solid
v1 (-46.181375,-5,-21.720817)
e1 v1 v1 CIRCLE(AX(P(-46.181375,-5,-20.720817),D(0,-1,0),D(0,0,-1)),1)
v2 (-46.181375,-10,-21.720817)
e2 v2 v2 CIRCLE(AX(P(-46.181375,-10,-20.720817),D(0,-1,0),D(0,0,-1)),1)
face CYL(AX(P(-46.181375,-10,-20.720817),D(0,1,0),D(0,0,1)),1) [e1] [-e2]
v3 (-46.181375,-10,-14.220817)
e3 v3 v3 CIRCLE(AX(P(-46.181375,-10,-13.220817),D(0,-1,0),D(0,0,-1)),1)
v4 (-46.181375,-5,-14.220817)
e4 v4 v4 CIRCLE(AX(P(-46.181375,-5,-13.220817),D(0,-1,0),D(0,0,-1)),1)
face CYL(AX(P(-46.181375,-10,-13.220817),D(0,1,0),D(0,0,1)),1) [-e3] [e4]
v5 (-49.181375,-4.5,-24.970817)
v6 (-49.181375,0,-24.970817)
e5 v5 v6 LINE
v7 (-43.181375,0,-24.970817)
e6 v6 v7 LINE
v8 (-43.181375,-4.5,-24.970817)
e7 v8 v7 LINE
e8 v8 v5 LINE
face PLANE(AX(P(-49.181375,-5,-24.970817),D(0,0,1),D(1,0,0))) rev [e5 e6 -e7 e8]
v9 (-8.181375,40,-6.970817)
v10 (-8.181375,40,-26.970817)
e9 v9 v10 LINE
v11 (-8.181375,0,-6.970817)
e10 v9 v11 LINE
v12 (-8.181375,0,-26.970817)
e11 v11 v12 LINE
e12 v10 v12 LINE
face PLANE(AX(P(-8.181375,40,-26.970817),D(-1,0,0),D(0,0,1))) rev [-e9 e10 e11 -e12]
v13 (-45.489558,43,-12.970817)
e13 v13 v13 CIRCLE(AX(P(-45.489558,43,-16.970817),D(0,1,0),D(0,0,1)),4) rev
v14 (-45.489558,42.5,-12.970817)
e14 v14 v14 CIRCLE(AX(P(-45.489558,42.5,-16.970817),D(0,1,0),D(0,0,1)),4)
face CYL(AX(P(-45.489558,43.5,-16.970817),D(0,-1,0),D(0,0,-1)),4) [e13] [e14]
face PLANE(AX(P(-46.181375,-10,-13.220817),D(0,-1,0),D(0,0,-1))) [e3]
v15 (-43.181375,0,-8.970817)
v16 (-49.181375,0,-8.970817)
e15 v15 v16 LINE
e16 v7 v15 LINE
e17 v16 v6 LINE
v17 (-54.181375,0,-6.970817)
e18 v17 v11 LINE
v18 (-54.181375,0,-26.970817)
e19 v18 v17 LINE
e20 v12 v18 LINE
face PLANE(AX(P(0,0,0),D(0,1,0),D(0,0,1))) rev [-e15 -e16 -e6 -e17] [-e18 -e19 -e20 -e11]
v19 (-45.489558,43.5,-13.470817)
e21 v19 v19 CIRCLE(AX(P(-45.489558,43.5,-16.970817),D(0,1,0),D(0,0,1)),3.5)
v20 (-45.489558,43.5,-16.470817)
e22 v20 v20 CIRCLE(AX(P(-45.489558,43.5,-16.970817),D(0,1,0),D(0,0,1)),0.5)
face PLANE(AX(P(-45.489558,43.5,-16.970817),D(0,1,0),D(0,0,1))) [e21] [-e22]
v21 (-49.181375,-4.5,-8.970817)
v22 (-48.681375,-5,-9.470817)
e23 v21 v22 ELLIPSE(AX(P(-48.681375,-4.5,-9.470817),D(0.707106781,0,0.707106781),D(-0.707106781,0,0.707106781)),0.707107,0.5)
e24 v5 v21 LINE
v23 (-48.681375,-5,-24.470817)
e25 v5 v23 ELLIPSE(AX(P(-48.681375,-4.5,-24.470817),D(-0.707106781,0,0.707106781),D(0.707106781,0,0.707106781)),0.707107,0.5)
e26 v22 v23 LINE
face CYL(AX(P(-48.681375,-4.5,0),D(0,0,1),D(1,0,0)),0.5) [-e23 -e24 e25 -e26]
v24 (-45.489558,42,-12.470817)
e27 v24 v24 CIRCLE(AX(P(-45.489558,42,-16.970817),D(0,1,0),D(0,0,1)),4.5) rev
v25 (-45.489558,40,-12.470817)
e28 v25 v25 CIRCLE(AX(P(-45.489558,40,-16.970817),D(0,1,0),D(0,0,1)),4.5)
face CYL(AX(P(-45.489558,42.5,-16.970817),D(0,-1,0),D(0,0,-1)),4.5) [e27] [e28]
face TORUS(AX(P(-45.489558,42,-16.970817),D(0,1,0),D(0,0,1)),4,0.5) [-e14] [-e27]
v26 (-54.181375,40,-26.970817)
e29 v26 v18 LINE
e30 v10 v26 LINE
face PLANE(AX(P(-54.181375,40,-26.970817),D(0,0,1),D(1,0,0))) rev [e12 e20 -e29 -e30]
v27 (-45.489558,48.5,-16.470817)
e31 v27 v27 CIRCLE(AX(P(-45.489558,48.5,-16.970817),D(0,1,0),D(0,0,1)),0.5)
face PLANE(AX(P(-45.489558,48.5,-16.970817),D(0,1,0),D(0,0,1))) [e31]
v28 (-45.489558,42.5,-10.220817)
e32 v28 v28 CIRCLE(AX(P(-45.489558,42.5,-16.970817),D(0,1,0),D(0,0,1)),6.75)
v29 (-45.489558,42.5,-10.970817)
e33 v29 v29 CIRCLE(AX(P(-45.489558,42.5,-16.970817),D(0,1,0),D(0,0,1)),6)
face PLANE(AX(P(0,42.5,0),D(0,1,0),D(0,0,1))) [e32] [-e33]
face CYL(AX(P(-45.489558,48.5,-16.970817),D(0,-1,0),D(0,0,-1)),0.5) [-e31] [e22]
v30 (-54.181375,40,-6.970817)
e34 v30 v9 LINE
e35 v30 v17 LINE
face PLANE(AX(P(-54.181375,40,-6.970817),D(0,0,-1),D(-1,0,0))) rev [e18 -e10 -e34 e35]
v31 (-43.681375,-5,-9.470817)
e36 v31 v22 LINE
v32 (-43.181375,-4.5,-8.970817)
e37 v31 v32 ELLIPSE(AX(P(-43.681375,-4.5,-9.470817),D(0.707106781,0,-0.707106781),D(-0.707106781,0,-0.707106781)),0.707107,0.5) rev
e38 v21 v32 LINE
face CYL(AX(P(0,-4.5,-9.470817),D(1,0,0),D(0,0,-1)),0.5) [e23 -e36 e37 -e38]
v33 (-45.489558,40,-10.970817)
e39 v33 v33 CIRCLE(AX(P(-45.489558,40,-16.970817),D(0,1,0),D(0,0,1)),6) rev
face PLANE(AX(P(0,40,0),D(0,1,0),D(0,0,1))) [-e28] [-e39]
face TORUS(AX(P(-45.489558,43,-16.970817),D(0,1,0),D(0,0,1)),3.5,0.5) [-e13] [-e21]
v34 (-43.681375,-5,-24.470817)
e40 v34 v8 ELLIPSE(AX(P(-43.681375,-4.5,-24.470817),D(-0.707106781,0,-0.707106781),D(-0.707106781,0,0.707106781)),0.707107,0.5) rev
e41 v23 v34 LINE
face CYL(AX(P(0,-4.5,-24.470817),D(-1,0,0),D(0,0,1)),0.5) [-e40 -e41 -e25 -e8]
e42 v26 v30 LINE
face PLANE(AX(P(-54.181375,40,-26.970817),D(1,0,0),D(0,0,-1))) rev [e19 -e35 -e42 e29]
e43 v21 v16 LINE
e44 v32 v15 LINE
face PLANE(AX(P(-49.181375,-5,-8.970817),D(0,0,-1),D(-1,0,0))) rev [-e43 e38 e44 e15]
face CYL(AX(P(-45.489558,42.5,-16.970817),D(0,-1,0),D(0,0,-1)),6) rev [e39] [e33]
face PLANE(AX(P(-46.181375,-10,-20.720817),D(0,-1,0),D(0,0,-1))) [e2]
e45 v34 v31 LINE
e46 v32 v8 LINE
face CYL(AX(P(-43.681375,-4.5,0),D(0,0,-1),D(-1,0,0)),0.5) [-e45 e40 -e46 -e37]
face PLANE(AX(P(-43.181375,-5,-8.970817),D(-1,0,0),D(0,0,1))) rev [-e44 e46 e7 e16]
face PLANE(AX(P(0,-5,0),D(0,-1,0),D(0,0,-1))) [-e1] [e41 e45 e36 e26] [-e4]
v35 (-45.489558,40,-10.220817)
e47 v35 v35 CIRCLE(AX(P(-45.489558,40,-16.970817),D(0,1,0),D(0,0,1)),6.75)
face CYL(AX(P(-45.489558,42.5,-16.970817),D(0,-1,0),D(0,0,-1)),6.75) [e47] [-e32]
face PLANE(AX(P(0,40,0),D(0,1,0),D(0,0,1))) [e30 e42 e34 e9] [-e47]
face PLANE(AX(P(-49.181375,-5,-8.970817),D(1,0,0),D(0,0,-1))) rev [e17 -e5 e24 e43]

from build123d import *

# Parameters (mm, degrees)
SKETCH1_W           = 46
SKETCH1_H           = 20
BOSS_EXTRUDE1_DEPTH = 40
BOSS_EXTRUDE2_DEPTH = 2.5
SKETCH3_R           = 4
BOSS_EXTRUDE3_DEPTH = 1
FILLET3_R           = 0.5
FILLET4_R           = 0.5
SKETCH5_R           = 0.5
BOSS_EXTRUDE4_DEPTH = 5
SKETCH6_W           = 6
SKETCH6_H           = 16
BOSS_EXTRUDE5_DEPTH = 5
FILLET5_R           = 0.5
SKETCH7_R           = 1
BOSS_EXTRUDE6_DEPTH = 5


with BuildPart() as part:
    # Sketch1 → Boss-Extrude1 (new body)
    with BuildSketch(Plane(origin=(0, 0, 0), x_dir=(1, 0, 0), z_dir=(0, 1, 0))):
        with Locations((-31.181375009, 16.970817206)):
            Rectangle(SKETCH1_W, SKETCH1_H)
    extrude(amount=BOSS_EXTRUDE1_DEPTH)

    # Sketch2 → Boss-Extrude2 (add)
    with BuildSketch(Plane(origin=(0, 40, 0), x_dir=(1, 0, 0), z_dir=(0, 1, 0))):
        with BuildLine():
            ThreePointArc((-49.989558352, 16.970817206), (-45.489558352, 12.470817206), (-40.989558352, 16.970817206))
            Line((-40.989558352, 16.970817206), (-49.989558352, 16.970817206))
        make_face()
        with BuildLine():
            Line((-49.989558352, 16.970817206), (-40.989558352, 16.970817206))
            ThreePointArc((-40.989558352, 16.970817206), (-45.489558352, 21.470817206), (-49.989558352, 16.970817206))
        make_face()
        with BuildLine():
            ThreePointArc((-51.489558352, 16.970817206), (-45.489558352, 22.970817206), (-39.489558352, 16.970817206))
            Line((-39.489558352, 16.970817206), (-38.739558352, 16.970817206))
            ThreePointArc((-38.739558352, 16.970817206), (-45.489558352, 23.720817206), (-52.239558352, 16.970817206))
            Line((-52.239558352, 16.970817206), (-51.489558352, 16.970817206))
        make_face()
        with BuildLine():
            Line((-38.739558352, 16.970817206), (-39.489558352, 16.970817206))
            ThreePointArc((-39.489558352, 16.970817206), (-45.489558352, 10.970817206), (-51.489558352, 16.970817206))
            Line((-51.489558352, 16.970817206), (-52.239558352, 16.970817206))
            ThreePointArc((-52.239558352, 16.970817206), (-45.489558352, 10.220817206), (-38.739558352, 16.970817206))
        make_face()
    extrude(amount=BOSS_EXTRUDE2_DEPTH)

    # Sketch3 → Boss-Extrude3 (add)
    with BuildSketch(Plane(origin=(0, 42.5, 0), x_dir=(1, 0, 0), z_dir=(0, 1, 0))):
        with Locations(Location((-45.489558352, 16.970817206, 0), (0, 0, 270))):
            Circle(SKETCH3_R)
    extrude(amount=BOSS_EXTRUDE3_DEPTH)

    # Fillet3
    fillet3_edges = [part.edges().sort_by_distance(p)[0] for p in [
        (-45.489558352, 43.5, -20.970817206),
    ]]
    fillet(fillet3_edges, radius=FILLET3_R)

    # Fillet4
    fillet4_edges = [part.edges().sort_by_distance(p)[0] for p in [
        (-40.989558352, 42.5, -16.970817206),
    ]]
    fillet(fillet4_edges, radius=FILLET4_R - 0.0001)  # a hair under: the kernel refuses the full size

    # Sketch5 → Boss-Extrude4 (add)
    with BuildSketch(Plane(origin=(0, 43.5, 0), x_dir=(1, 0, 0), z_dir=(0, 1, 0))):
        with Locations(Location((-45.489558352, 16.970817206, 0), (0, 0, 270))):
            Circle(SKETCH5_R)
    extrude(amount=BOSS_EXTRUDE4_DEPTH)

    # Sketch6 → Boss-Extrude5 (add)
    with BuildSketch(Plane.XZ):
        with Locations((-46.181375009, -16.970817206)):
            Rectangle(SKETCH6_W, SKETCH6_H)
    extrude(amount=BOSS_EXTRUDE5_DEPTH)

    # Fillet5
    fillet5_edges = [part.edges().sort_by_distance(p)[0] for p in [
        (-49.181375009, -5, -16.970817206),
        (-46.181375009, -5, -24.970817206),
        (-43.181375009, -5, -16.970817206),
        (-46.181375009, -5, -8.970817206),
    ]]
    fillet(fillet5_edges, radius=FILLET5_R)

    # Sketch7 → Boss-Extrude6 (add)
    with BuildSketch(Plane(origin=(0, -5, 0), x_dir=(-1, 0, 0), z_dir=(0, -1, 0))):
        with Locations(Location((46.181375009, 13.220817206, 0), (0, 0, 90))):
            Circle(SKETCH7_R)
        with Locations(Location((46.181375009, 20.720817206, 0), (0, 0, 90))):
            Circle(SKETCH7_R)
    extrude(amount=BOSS_EXTRUDE6_DEPTH)


solid = part.part
